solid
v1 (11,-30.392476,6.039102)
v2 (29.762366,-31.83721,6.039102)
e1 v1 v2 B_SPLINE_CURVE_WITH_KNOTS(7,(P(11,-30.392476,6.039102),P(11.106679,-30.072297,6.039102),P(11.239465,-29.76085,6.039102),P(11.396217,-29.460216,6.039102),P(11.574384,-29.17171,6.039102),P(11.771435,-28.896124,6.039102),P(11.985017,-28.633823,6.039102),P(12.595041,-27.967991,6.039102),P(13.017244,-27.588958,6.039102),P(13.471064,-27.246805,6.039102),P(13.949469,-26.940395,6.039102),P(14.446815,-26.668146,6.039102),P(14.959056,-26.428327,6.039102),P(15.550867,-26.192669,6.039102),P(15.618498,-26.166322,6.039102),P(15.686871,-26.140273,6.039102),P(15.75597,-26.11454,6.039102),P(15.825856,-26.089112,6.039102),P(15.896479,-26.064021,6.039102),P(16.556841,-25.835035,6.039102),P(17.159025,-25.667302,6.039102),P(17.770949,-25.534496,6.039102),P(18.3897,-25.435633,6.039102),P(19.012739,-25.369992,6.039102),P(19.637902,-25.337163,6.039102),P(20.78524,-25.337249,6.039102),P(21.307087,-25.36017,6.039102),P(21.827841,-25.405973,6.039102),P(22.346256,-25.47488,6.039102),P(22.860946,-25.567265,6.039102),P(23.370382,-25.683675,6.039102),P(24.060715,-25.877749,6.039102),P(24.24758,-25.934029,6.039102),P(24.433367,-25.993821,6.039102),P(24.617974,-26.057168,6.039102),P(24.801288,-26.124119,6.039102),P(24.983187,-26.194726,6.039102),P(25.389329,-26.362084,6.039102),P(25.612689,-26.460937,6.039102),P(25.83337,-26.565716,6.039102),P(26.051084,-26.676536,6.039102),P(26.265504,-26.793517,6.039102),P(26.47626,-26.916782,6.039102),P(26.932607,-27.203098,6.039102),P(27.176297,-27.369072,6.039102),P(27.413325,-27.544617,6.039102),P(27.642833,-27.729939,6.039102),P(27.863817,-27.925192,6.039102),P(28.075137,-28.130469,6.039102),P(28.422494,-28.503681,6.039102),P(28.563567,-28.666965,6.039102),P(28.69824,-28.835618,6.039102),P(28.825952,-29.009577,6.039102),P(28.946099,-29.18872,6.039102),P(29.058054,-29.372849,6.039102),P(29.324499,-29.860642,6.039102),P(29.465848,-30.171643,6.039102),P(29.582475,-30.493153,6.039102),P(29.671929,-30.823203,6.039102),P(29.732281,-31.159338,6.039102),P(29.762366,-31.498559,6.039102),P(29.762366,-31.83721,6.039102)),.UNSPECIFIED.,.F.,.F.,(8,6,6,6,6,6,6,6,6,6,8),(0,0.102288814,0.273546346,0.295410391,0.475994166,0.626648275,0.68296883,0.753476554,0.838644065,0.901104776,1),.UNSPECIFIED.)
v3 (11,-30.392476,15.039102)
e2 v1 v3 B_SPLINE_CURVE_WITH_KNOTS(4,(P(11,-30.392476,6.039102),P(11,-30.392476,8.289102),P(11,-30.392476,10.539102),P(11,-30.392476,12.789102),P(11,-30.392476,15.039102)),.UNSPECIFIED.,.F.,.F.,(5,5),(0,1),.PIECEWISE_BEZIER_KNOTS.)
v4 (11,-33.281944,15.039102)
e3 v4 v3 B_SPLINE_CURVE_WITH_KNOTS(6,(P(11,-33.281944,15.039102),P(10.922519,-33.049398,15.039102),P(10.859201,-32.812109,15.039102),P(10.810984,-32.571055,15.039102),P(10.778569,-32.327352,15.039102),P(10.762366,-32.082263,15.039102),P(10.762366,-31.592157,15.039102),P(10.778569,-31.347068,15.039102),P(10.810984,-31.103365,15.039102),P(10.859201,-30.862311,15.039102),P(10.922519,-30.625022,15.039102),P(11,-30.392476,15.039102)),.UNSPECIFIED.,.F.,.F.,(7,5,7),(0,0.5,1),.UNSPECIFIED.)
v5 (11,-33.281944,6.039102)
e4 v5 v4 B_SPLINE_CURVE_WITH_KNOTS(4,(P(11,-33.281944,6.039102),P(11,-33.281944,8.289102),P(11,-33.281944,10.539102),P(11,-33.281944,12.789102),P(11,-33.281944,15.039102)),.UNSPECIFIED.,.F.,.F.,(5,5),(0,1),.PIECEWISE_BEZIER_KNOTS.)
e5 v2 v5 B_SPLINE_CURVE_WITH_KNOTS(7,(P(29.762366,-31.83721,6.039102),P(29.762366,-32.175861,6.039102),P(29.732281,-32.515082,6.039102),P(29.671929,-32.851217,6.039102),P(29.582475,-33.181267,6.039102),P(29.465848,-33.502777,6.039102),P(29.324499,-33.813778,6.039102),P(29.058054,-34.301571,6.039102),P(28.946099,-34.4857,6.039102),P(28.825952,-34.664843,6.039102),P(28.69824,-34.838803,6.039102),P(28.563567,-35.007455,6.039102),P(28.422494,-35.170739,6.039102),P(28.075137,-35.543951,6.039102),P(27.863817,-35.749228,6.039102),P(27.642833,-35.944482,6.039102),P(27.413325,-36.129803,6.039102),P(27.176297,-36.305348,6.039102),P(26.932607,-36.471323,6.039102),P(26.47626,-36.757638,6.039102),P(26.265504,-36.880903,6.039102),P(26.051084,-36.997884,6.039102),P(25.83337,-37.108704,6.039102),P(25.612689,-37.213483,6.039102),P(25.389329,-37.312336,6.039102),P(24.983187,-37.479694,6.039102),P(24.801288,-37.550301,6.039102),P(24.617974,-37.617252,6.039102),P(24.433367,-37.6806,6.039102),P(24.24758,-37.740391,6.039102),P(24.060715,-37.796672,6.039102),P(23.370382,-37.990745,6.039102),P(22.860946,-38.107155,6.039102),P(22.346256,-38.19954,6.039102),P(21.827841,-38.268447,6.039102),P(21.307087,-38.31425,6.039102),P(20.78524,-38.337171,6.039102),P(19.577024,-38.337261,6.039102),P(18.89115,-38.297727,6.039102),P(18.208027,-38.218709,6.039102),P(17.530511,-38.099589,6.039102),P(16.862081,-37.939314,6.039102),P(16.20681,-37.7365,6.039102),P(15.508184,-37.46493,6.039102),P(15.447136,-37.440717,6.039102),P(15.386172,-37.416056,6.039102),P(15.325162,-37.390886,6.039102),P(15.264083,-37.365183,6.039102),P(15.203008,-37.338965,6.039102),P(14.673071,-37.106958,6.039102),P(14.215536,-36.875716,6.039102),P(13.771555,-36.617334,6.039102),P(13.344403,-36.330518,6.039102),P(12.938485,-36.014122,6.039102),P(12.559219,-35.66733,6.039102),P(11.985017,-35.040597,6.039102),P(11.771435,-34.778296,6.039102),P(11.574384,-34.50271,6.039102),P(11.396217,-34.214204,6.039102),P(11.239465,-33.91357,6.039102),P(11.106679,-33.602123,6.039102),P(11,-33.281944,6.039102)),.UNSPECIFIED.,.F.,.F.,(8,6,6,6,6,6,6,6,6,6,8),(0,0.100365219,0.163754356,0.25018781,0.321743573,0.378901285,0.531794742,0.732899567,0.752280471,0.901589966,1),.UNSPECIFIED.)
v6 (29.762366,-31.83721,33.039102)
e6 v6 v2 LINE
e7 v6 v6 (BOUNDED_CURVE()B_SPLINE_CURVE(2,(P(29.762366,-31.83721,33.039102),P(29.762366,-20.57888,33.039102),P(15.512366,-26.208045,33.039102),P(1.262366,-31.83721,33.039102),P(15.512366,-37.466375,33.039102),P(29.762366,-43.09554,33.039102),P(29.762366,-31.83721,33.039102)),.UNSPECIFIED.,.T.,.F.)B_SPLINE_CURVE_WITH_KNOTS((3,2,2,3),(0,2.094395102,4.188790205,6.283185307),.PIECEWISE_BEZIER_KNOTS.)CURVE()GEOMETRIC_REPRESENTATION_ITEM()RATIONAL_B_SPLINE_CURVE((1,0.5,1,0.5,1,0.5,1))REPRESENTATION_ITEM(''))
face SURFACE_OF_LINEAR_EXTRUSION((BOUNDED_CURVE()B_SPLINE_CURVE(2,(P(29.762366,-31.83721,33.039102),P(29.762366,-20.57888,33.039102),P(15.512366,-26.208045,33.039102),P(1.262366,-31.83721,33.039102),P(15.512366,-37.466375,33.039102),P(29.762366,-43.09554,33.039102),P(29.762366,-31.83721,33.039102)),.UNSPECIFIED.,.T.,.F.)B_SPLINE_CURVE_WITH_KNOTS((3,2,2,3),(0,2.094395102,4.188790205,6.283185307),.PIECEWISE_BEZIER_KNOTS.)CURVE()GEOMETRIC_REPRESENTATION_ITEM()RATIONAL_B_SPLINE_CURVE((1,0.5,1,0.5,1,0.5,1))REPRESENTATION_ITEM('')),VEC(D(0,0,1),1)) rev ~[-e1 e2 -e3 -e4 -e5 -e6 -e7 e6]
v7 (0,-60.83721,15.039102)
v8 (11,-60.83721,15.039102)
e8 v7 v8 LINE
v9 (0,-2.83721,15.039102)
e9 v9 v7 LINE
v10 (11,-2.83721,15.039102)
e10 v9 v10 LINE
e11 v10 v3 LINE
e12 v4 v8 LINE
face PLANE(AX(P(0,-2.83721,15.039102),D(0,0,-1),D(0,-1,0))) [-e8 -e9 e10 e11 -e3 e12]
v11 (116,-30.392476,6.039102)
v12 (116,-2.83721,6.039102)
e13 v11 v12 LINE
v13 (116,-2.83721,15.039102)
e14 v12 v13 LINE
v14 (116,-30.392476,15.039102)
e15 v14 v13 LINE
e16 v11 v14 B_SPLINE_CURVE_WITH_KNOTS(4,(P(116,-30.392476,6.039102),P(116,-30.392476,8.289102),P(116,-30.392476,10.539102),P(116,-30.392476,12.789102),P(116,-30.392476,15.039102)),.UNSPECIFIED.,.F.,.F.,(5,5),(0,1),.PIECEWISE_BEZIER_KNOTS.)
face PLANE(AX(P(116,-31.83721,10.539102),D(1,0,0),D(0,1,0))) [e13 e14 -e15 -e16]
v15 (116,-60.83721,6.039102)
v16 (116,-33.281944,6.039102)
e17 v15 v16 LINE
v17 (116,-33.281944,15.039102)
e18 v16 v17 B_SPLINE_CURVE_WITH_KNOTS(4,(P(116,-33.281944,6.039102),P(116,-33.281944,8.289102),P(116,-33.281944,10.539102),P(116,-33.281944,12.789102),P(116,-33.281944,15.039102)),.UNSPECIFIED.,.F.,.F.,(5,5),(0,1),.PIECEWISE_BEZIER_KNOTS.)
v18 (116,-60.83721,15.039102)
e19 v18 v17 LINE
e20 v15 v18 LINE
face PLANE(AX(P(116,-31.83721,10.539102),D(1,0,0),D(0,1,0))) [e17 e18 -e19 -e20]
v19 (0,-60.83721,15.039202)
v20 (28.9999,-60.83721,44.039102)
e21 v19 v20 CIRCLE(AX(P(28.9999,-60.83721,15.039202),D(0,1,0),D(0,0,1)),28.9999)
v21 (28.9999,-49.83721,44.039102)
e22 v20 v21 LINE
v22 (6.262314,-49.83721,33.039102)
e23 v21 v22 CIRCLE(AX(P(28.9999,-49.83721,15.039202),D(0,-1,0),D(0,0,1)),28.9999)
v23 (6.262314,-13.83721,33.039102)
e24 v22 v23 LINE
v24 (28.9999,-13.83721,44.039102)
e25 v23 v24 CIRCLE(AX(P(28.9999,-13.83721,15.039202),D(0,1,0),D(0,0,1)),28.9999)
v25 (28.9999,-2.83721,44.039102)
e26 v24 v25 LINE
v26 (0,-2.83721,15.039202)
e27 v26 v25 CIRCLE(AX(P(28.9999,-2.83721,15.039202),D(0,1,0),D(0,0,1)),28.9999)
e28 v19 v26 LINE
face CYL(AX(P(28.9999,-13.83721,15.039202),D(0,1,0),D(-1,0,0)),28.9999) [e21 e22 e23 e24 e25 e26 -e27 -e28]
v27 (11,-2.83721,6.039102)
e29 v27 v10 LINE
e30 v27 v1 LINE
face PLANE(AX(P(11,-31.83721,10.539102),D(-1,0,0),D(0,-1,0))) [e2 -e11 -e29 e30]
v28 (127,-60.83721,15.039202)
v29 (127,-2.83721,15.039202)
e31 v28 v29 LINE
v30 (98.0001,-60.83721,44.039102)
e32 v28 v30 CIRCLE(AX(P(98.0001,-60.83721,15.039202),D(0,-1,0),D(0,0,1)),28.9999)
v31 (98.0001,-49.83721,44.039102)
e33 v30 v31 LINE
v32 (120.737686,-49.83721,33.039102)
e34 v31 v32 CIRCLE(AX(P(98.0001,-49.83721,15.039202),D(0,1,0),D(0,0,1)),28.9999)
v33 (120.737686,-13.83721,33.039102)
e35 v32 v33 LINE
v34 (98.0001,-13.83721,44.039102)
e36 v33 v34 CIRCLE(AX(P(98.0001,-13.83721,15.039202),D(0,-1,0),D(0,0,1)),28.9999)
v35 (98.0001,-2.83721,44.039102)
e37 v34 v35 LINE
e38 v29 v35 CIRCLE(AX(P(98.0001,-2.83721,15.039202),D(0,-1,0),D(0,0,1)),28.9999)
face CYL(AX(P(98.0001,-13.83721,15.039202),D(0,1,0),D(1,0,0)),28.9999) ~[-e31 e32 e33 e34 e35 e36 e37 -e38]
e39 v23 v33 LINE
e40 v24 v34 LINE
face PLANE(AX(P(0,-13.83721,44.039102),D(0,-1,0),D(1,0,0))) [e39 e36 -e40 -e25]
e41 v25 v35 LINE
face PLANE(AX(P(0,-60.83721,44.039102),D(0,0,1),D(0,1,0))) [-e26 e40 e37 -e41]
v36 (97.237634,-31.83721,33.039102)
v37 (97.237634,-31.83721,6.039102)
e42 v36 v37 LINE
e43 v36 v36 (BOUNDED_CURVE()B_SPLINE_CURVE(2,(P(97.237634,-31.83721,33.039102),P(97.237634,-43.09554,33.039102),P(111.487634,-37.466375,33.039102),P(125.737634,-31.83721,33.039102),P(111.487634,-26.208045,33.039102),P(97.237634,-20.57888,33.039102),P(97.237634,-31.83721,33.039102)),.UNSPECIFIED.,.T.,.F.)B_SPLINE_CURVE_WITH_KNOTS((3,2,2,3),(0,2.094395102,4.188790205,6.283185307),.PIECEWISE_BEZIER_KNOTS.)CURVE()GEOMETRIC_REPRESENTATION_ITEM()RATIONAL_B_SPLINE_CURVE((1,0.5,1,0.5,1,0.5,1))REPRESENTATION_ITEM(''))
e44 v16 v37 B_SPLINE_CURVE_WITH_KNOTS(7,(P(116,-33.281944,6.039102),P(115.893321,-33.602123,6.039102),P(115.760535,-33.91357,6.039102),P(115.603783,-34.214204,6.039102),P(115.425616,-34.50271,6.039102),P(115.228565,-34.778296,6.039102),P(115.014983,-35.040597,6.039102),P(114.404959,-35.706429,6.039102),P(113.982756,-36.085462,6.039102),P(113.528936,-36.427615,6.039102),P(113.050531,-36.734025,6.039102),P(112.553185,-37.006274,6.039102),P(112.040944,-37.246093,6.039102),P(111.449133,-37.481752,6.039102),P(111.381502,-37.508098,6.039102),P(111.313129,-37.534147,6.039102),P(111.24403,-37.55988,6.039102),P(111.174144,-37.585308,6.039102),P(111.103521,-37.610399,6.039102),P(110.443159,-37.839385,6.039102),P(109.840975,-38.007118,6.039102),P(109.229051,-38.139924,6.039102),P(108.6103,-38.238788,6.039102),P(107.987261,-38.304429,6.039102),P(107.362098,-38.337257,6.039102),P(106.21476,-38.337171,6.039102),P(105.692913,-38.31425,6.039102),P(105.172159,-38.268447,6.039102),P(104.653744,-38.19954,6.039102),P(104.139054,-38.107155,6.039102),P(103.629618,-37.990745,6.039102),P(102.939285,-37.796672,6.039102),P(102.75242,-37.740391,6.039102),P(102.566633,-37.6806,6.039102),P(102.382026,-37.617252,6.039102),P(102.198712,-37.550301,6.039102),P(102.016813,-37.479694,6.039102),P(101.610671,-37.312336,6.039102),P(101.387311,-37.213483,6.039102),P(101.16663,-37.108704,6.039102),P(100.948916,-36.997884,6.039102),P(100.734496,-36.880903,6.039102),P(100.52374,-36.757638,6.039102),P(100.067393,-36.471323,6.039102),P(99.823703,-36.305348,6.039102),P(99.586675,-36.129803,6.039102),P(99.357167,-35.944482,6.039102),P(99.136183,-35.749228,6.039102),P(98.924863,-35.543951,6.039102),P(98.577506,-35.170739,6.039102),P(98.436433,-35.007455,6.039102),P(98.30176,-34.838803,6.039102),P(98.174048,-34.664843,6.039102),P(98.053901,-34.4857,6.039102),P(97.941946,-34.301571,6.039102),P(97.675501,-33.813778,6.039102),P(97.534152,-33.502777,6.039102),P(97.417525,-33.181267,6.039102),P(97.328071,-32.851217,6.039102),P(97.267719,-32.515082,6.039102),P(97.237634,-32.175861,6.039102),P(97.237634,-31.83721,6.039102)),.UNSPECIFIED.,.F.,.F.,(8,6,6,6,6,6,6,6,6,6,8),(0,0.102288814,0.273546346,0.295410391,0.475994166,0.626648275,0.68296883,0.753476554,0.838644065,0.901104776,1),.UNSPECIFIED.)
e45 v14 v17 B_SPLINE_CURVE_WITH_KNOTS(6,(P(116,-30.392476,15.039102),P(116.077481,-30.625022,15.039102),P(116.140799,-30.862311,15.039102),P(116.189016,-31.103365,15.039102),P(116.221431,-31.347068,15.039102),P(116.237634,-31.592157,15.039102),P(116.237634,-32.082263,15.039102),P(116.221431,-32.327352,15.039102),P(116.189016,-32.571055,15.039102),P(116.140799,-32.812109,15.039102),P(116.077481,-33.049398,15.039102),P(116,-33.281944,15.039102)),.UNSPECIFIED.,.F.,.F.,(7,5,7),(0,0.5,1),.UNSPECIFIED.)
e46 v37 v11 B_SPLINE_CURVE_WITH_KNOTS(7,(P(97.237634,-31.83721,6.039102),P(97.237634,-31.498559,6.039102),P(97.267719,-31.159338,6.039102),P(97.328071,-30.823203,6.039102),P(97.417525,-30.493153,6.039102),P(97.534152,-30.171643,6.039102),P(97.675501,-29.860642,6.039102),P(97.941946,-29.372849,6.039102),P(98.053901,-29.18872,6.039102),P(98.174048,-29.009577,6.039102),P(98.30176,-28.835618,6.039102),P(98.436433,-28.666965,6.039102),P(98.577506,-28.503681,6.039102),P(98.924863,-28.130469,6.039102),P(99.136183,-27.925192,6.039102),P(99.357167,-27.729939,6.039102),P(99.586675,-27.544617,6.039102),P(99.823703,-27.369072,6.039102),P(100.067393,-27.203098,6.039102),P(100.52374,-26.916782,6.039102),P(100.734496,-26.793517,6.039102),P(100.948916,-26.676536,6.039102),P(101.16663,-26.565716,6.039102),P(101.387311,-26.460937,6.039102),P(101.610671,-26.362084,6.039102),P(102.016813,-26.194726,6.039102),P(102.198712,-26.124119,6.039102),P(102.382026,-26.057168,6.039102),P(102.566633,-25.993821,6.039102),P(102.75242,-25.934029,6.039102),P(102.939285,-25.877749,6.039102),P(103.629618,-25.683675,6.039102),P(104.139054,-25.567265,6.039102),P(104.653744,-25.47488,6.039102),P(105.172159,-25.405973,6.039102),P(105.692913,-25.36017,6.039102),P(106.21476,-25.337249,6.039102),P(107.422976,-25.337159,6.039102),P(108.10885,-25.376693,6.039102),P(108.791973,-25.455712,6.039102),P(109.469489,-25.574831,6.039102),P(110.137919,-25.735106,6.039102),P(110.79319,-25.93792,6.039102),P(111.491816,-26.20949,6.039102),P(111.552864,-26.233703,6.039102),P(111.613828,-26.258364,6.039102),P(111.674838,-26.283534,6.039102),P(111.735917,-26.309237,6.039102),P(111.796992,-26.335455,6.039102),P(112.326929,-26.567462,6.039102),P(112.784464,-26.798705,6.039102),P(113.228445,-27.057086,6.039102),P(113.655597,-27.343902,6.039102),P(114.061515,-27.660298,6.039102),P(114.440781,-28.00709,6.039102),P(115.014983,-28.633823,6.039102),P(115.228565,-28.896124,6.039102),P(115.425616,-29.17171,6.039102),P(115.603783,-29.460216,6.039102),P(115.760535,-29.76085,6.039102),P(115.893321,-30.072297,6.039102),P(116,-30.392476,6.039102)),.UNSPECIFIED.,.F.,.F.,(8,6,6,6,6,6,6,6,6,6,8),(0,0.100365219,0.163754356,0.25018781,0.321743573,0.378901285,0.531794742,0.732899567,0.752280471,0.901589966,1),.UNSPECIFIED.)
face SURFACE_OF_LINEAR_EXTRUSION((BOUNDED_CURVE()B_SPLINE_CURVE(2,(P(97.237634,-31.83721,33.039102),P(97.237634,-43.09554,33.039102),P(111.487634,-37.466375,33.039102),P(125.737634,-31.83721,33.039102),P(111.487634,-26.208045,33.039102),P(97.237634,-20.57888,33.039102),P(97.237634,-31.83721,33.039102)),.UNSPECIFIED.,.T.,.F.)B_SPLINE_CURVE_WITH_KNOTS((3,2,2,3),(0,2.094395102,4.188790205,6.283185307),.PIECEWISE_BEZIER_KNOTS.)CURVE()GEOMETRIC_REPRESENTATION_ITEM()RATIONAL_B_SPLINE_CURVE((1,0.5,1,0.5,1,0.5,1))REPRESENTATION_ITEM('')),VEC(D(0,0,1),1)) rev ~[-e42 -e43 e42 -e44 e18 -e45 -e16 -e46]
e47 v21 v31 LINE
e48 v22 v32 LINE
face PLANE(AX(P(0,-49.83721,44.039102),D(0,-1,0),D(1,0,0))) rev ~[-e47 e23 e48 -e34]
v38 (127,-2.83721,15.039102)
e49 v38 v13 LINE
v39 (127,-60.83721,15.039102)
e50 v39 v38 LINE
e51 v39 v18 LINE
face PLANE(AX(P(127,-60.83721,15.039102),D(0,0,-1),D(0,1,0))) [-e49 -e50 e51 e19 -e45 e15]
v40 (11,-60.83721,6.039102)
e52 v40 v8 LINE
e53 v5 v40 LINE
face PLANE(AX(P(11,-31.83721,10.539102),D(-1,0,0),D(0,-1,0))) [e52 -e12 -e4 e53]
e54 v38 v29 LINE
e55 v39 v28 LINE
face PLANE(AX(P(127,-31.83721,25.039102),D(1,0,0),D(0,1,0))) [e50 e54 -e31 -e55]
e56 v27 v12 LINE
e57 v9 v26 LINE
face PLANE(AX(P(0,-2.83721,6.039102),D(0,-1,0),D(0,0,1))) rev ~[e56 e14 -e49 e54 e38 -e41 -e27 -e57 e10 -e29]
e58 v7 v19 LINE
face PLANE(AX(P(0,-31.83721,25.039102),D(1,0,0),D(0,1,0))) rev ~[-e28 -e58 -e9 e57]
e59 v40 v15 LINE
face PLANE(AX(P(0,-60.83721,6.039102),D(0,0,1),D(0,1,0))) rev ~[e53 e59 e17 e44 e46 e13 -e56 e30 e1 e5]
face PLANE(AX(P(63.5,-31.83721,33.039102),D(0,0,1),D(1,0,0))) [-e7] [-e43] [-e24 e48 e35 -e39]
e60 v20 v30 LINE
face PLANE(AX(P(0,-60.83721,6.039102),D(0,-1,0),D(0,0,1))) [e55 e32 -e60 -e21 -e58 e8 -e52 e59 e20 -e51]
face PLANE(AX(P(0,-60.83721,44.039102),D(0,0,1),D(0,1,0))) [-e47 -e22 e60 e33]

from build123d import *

# Parameters (mm, degrees)
F0_W      = 58
F0_H      = 38
F1_DEPTH  = 127
F2_W      = 58
F2_H      = 9
F3_DEPTH  = 11
F4_W      = 58
F4_H      = 9
F5_DEPTH  = 11
F6_W      = 127
F6_H      = 36
F7_DEPTH  = 11
F8_F1_R   = 28.9999
F8_F2_R   = 28.9999
F12_DEPTH = 38


# Not quite as in the source:
# - a fillet or chamfer is up to 0.001 mm smaller than in the source, because OpenCascade refuses the exact size


with BuildPart() as f1:
    # F0 (on Right) → F1 (new body)
    with BuildSketch(Plane.YZ):
        with Locations((-31.8372100785, 25.0391024165)):
            Rectangle(F0_W, F0_H)
    extrude(amount=F1_DEPTH)

    # F2 (on face) → F3 (cut)
    with BuildSketch(Plane.YZ.offset(127)):
        with Locations((-31.8372100785, 10.5391024165)):
            Rectangle(F2_W, F2_H)
    extrude(amount=-F3_DEPTH, mode=Mode.SUBTRACT)

    # F4 (on face) → F5 (cut)
    with BuildSketch(Plane(origin=(0, 0, 0), x_dir=(0, -1, 0), z_dir=(-1, 0, 0))):
        with Locations((31.8372100785, 10.5391024165)):
            Rectangle(F4_W, F4_H)
    extrude(amount=-F5_DEPTH, mode=Mode.SUBTRACT)

    # F6 (on face) → F7 (cut)
    with BuildSketch(Plane.XY.offset(44.0391024165)):
        with Locations((63.5, -31.8372100785)):
            Rectangle(F6_W, F6_H)
    extrude(amount=-F7_DEPTH, mode=Mode.SUBTRACT)

    # F8: fillet of radius 29 on 4 edges, made by hand

    # F8_f1 (radius 29 in the source; OpenCascade refuses exactly that, so slightly less here)
    f8_f1_edges = [f1.edges().sort_by_distance(p)[0] for p in [
        (0, -8.3372100785, 44.0391024165),
    ]]
    fillet(f8_f1_edges, radius=F8_F1_R)

    # F8_f2 (radius 29 in the source; OpenCascade refuses exactly that, so slightly less here)
    f8_f2_edges = [f1.edges().sort_by_distance(p)[0] for p in [
        (127, -8.3372100785, 44.0391024165),
    ]]
    fillet(f8_f2_edges, radius=F8_F2_R)

    # F11 (on face) → F12 (cut)
    with BuildSketch(Plane.XY.offset(33.0391024165)):
        with BuildLine():
            add(Edge.make_bspline(
                [(29.7623659982, -31.8372100785), (29.7623659982, -20.5788798293), (15.5123659982, -26.2080449539), (1.2623659982, -31.8372100785), (15.5123659982, -37.4663752031), (29.7623659982, -43.0955403277), (29.7623659982, -31.8372100785)],
                knots=[0, 0, 0, 2.0943951024, 2.0943951024, 4.1887902048, 4.1887902048, 6.2831853072, 6.2831853072, 6.2831853072], degree=2, weights=[1, 0.5, 1, 0.5, 1, 0.5, 1]))
        make_face()
        with BuildLine():
            add(Edge.make_bspline(
                [(97.2376340018, -31.8372100785), (97.2376340018, -43.0955403277), (111.4876340018, -37.4663752031), (125.7376340018, -31.8372100785), (111.4876340018, -26.2080449539), (97.2376340018, -20.5788798293), (97.2376340018, -31.8372100785)],
                knots=[0, 0, 0, 2.0943951024, 2.0943951024, 4.1887902048, 4.1887902048, 6.2831853072, 6.2831853072, 6.2831853072], degree=2, weights=[1, 0.5, 1, 0.5, 1, 0.5, 1]))
        make_face()
    extrude(amount=-F12_DEPTH, mode=Mode.SUBTRACT)


solid = f1.part
